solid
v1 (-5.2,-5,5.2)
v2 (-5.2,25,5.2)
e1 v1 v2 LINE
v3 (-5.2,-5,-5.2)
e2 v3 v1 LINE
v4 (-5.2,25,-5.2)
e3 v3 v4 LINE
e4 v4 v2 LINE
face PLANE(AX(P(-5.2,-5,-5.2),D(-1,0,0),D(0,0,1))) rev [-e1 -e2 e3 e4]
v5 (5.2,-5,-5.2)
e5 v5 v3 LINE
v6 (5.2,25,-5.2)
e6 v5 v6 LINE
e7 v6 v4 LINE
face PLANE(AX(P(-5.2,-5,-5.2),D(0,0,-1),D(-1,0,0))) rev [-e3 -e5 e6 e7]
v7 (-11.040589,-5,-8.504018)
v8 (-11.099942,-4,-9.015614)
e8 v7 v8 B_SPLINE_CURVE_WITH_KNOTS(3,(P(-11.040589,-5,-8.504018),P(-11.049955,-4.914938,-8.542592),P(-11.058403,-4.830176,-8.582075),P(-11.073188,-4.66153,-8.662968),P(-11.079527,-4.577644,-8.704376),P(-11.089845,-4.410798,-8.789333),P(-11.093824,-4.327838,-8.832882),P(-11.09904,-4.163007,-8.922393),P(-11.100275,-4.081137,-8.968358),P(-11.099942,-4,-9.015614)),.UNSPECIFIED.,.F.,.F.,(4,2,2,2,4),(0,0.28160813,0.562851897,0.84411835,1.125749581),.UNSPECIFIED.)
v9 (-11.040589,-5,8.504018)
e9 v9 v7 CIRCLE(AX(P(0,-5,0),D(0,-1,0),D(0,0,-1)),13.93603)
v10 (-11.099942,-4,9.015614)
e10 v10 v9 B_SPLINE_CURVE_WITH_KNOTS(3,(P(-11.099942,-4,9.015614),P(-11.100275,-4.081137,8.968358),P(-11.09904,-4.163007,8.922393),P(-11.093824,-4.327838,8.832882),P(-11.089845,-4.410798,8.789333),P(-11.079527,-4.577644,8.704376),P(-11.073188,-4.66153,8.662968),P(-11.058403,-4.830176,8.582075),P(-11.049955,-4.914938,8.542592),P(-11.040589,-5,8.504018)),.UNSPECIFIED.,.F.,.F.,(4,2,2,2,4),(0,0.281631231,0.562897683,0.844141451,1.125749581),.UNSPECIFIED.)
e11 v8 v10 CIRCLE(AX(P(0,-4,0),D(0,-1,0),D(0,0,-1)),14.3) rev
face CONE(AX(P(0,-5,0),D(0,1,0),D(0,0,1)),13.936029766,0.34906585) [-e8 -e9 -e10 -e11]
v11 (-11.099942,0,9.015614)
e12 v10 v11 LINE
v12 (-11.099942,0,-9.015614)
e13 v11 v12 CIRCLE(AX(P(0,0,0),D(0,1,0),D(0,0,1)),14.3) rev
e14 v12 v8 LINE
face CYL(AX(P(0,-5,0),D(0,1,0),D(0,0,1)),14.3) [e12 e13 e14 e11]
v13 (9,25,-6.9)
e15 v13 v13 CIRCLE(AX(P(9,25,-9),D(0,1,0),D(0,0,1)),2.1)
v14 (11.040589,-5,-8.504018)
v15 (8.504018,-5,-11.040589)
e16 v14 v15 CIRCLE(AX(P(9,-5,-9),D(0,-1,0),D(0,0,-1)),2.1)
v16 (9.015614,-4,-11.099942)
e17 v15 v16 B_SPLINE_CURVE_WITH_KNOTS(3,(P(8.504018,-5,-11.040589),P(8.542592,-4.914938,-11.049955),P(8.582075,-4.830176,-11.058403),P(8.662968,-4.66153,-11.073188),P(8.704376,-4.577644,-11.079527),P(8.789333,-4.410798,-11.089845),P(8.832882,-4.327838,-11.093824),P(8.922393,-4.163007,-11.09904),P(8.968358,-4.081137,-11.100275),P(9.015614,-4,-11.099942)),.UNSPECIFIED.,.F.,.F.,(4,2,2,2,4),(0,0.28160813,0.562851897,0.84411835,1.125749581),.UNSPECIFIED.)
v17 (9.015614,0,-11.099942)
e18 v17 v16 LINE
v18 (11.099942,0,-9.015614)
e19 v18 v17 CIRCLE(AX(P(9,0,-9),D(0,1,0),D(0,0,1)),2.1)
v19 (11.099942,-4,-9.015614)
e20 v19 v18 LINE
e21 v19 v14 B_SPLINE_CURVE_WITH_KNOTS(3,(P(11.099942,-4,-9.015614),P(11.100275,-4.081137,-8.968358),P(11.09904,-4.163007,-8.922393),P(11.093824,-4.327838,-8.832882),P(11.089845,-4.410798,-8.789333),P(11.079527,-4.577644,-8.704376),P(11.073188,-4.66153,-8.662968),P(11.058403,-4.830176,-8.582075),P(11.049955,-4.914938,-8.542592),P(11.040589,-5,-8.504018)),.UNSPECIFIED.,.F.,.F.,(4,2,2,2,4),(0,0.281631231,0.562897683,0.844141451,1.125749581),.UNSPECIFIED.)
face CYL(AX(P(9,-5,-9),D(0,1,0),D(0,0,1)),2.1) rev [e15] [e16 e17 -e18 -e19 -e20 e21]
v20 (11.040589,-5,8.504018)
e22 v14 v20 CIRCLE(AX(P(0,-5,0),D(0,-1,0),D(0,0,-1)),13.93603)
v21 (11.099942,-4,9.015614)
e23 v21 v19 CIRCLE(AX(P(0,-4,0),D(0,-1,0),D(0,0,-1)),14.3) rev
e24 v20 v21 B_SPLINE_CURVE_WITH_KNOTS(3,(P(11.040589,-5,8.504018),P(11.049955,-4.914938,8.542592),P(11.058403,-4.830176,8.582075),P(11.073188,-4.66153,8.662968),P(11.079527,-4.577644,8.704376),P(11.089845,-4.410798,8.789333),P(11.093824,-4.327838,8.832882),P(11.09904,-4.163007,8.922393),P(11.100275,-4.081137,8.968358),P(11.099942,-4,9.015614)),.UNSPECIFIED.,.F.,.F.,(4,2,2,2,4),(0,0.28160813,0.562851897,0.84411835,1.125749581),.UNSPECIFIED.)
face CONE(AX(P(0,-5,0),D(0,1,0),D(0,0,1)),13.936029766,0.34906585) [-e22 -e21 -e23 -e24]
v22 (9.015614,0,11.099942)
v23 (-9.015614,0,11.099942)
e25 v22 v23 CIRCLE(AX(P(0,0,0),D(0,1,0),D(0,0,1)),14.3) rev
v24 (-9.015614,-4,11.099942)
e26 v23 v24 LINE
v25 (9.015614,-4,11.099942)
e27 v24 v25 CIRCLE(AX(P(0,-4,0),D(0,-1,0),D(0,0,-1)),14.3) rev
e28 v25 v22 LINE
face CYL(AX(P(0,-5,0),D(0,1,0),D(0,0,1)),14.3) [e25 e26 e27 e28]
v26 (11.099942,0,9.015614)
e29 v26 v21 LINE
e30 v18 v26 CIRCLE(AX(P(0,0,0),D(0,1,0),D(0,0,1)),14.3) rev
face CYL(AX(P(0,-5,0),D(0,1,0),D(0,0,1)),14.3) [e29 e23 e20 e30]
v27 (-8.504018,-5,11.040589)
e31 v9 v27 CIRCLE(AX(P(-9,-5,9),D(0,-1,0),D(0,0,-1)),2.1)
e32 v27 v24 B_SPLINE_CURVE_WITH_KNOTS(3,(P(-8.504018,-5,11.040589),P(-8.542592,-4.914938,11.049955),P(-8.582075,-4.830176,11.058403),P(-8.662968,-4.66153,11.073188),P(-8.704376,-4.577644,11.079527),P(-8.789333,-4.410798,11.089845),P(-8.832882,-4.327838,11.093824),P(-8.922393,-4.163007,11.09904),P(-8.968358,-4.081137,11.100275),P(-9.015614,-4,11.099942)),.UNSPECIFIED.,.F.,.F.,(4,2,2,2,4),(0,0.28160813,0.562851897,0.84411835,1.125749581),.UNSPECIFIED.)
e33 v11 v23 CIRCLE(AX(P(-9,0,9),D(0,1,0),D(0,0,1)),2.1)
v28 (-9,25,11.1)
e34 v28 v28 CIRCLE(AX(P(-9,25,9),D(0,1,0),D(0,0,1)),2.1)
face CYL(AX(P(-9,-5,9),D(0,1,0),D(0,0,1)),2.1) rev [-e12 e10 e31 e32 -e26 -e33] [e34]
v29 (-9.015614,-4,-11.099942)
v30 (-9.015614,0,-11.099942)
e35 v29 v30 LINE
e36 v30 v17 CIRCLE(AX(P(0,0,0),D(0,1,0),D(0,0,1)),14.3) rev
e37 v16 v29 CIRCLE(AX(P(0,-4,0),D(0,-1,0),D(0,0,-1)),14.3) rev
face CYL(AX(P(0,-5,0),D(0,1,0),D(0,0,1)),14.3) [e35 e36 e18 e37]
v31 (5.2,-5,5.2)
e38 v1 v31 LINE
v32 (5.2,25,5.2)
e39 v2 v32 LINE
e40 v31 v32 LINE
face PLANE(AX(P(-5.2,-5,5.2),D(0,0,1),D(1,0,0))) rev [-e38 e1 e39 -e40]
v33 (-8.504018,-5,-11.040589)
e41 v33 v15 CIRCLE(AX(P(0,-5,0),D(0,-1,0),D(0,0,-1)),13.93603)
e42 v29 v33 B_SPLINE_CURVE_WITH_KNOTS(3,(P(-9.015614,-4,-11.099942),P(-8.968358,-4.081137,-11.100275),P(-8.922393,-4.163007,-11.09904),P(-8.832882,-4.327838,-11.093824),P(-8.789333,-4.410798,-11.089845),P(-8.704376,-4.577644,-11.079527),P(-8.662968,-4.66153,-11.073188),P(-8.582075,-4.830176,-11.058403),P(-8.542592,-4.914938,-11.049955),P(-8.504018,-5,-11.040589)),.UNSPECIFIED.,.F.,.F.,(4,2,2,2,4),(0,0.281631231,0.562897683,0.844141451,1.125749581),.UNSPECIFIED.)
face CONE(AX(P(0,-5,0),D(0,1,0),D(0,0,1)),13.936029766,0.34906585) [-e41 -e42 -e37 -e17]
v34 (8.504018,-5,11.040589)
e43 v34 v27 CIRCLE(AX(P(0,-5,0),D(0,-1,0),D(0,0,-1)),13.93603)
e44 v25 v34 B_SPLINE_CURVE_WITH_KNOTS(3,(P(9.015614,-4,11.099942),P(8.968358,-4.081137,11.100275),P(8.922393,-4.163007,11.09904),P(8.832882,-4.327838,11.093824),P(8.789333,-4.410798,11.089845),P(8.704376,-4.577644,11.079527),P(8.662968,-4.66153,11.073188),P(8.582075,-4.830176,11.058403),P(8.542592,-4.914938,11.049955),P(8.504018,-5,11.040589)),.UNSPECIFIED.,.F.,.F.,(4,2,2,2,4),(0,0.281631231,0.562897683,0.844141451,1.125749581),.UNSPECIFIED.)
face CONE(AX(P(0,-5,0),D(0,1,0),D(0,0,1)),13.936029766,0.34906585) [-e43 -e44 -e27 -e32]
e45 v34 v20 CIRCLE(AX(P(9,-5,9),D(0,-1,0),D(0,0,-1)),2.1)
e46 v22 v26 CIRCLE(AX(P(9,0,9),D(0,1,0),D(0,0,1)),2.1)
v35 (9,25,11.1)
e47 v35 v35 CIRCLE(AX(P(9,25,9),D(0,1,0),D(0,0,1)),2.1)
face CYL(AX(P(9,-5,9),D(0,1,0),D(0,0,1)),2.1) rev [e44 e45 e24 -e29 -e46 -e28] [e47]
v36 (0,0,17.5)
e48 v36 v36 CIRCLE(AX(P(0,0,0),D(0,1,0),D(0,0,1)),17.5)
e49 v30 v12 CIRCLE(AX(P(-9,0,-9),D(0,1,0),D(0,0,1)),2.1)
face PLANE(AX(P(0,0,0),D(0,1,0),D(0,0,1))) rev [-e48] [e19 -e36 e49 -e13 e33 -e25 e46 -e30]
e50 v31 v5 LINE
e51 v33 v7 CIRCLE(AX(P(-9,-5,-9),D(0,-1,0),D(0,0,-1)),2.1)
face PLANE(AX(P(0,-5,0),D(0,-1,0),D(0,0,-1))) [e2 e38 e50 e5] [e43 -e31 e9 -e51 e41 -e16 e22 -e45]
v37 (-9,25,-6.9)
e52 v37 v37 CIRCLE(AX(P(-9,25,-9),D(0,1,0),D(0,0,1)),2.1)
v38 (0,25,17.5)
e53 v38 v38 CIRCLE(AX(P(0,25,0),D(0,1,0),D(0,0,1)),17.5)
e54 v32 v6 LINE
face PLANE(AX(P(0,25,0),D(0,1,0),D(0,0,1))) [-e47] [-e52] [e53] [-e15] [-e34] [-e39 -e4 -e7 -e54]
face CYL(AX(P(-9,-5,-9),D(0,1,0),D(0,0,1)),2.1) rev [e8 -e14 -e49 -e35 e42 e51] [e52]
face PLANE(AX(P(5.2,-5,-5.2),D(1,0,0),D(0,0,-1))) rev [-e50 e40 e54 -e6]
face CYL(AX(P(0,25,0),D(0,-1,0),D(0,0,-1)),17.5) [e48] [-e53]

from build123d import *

# Parameters (mm, degrees)
SKETCH1_R           = 17.5
BOSS_EXTRUDE1_DEPTH = 25
SKETCH3_R           = 14.3
BOSS_EXTRUDE2_DEPTH = 5
SKETCH4_W           = 10.4
SKETCH4_H           = 10.4
CUT_EXTRUDE1_DEPTH  = 39.890872965
SKETCH6_R           = 2.1
CUT_EXTRUDE2_DEPTH  = 39.890872965
CHAMFER1_SIZE       = 0.363970234
CHAMFER1_SIZE_2     = 1


with BuildPart() as part:
    # Sketch1 → Boss-Extrude1 (new body)
    with BuildSketch(Plane(origin=(0, 0, 0), x_dir=(1, 0, 0), z_dir=(0, 1, 0))):
        with Locations(Location((0, 0, 0), (0, 0, 270))):
            Circle(SKETCH1_R)
    extrude(amount=BOSS_EXTRUDE1_DEPTH)

    # Sketch3 → Boss-Extrude2 (add)
    with BuildSketch(Plane.XZ):
        with Locations(Location((0, 0, 0), (0, 0, 90))):
            Circle(SKETCH3_R)
    extrude(amount=BOSS_EXTRUDE2_DEPTH)

    # Sketch4 → Cut-Extrude1 (cut, through all)
    with BuildSketch(Plane(origin=(0, 25, 0), x_dir=(1, 0, 0), z_dir=(0, 1, 0))):
        Rectangle(SKETCH4_W, SKETCH4_H)
    extrude(amount=-CUT_EXTRUDE1_DEPTH, mode=Mode.SUBTRACT)

    # Sketch6 → Cut-Extrude2 (cut, through all)
    with BuildSketch(Plane(origin=(0, 25, 0), x_dir=(1, 0, 0), z_dir=(0, 1, 0))):
        with Locations(Location((9, -9, 0), (0, 0, 270))):
            Circle(SKETCH6_R)
        with Locations(Location((-9, -9, 0), (0, 0, 270))):
            Circle(SKETCH6_R)
        with Locations(Location((-9, 9, 0), (0, 0, 270))):
            Circle(SKETCH6_R)
        with Locations(Location((9, 9, 0), (0, 0, 270))):
            Circle(SKETCH6_R)
    extrude(amount=-CUT_EXTRUDE2_DEPTH, mode=Mode.SUBTRACT)

    # Chamfer1
    # the kernel refuses this chamfer: 1, 0.363970234 mm, written as the material it takes off along each edge
    with BuildSketch(Plane(origin=(0, -5, 0), x_dir=(-0.7601968687413804, 0, 0.649692789521171), z_dir=(-0.649692789521171, 0, -0.7601968687413804))) as chamfer1_piece_1:
        Polygon((14.3 - CHAMFER1_SIZE, 0), (14.3, CHAMFER1_SIZE_2), (14.3, 0), align=None)
    revolve(axis=Axis((0, -5, 0), (0, 1, 0)), revolution_arc=98.963112953, mode=Mode.SUBTRACT)
    with BuildSketch(Plane(origin=(0, -5, 0), x_dir=(-0.6496927895211715, 0, 0.7601968687413799), z_dir=(0.7601968687413799, 0, 0.6496927895211715))) as chamfer1_piece_2:
        Polygon((14.3 - CHAMFER1_SIZE, 0), (14.3, -CHAMFER1_SIZE_2), (14.3, 0), align=None)
    revolve(axis=Axis((0, -5, 0), (0, -1, 0)), revolution_arc=98.963112953, mode=Mode.SUBTRACT)
    with BuildSketch(Plane(origin=(0, -5, 0), x_dir=(-0.7601968687413795, 0, -0.6496927895211719), z_dir=(-0.6496927895211719, 0, 0.7601968687413795))) as chamfer1_piece_3:
        Polygon((14.3, -CHAMFER1_SIZE_2), (14.3 - CHAMFER1_SIZE, 0), (14.3, 0), align=None)
    revolve(axis=Axis((0, -5, 0), (0, -1, 0)), revolution_arc=98.963112953, mode=Mode.SUBTRACT)
    with BuildSketch(Plane(origin=(0, -5, 0), x_dir=(0.6496927895211716, 0, -0.7601968687413798), z_dir=(-0.7601968687413798, 0, -0.6496927895211716))) as chamfer1_piece_4:
        Polygon((14.3, -CHAMFER1_SIZE_2), (14.3 - CHAMFER1_SIZE, 0), (14.3, 0), align=None)
    revolve(axis=Axis((0, -5, 0), (0, -1, 0)), revolution_arc=98.963112953, mode=Mode.SUBTRACT)


solid = part.part
